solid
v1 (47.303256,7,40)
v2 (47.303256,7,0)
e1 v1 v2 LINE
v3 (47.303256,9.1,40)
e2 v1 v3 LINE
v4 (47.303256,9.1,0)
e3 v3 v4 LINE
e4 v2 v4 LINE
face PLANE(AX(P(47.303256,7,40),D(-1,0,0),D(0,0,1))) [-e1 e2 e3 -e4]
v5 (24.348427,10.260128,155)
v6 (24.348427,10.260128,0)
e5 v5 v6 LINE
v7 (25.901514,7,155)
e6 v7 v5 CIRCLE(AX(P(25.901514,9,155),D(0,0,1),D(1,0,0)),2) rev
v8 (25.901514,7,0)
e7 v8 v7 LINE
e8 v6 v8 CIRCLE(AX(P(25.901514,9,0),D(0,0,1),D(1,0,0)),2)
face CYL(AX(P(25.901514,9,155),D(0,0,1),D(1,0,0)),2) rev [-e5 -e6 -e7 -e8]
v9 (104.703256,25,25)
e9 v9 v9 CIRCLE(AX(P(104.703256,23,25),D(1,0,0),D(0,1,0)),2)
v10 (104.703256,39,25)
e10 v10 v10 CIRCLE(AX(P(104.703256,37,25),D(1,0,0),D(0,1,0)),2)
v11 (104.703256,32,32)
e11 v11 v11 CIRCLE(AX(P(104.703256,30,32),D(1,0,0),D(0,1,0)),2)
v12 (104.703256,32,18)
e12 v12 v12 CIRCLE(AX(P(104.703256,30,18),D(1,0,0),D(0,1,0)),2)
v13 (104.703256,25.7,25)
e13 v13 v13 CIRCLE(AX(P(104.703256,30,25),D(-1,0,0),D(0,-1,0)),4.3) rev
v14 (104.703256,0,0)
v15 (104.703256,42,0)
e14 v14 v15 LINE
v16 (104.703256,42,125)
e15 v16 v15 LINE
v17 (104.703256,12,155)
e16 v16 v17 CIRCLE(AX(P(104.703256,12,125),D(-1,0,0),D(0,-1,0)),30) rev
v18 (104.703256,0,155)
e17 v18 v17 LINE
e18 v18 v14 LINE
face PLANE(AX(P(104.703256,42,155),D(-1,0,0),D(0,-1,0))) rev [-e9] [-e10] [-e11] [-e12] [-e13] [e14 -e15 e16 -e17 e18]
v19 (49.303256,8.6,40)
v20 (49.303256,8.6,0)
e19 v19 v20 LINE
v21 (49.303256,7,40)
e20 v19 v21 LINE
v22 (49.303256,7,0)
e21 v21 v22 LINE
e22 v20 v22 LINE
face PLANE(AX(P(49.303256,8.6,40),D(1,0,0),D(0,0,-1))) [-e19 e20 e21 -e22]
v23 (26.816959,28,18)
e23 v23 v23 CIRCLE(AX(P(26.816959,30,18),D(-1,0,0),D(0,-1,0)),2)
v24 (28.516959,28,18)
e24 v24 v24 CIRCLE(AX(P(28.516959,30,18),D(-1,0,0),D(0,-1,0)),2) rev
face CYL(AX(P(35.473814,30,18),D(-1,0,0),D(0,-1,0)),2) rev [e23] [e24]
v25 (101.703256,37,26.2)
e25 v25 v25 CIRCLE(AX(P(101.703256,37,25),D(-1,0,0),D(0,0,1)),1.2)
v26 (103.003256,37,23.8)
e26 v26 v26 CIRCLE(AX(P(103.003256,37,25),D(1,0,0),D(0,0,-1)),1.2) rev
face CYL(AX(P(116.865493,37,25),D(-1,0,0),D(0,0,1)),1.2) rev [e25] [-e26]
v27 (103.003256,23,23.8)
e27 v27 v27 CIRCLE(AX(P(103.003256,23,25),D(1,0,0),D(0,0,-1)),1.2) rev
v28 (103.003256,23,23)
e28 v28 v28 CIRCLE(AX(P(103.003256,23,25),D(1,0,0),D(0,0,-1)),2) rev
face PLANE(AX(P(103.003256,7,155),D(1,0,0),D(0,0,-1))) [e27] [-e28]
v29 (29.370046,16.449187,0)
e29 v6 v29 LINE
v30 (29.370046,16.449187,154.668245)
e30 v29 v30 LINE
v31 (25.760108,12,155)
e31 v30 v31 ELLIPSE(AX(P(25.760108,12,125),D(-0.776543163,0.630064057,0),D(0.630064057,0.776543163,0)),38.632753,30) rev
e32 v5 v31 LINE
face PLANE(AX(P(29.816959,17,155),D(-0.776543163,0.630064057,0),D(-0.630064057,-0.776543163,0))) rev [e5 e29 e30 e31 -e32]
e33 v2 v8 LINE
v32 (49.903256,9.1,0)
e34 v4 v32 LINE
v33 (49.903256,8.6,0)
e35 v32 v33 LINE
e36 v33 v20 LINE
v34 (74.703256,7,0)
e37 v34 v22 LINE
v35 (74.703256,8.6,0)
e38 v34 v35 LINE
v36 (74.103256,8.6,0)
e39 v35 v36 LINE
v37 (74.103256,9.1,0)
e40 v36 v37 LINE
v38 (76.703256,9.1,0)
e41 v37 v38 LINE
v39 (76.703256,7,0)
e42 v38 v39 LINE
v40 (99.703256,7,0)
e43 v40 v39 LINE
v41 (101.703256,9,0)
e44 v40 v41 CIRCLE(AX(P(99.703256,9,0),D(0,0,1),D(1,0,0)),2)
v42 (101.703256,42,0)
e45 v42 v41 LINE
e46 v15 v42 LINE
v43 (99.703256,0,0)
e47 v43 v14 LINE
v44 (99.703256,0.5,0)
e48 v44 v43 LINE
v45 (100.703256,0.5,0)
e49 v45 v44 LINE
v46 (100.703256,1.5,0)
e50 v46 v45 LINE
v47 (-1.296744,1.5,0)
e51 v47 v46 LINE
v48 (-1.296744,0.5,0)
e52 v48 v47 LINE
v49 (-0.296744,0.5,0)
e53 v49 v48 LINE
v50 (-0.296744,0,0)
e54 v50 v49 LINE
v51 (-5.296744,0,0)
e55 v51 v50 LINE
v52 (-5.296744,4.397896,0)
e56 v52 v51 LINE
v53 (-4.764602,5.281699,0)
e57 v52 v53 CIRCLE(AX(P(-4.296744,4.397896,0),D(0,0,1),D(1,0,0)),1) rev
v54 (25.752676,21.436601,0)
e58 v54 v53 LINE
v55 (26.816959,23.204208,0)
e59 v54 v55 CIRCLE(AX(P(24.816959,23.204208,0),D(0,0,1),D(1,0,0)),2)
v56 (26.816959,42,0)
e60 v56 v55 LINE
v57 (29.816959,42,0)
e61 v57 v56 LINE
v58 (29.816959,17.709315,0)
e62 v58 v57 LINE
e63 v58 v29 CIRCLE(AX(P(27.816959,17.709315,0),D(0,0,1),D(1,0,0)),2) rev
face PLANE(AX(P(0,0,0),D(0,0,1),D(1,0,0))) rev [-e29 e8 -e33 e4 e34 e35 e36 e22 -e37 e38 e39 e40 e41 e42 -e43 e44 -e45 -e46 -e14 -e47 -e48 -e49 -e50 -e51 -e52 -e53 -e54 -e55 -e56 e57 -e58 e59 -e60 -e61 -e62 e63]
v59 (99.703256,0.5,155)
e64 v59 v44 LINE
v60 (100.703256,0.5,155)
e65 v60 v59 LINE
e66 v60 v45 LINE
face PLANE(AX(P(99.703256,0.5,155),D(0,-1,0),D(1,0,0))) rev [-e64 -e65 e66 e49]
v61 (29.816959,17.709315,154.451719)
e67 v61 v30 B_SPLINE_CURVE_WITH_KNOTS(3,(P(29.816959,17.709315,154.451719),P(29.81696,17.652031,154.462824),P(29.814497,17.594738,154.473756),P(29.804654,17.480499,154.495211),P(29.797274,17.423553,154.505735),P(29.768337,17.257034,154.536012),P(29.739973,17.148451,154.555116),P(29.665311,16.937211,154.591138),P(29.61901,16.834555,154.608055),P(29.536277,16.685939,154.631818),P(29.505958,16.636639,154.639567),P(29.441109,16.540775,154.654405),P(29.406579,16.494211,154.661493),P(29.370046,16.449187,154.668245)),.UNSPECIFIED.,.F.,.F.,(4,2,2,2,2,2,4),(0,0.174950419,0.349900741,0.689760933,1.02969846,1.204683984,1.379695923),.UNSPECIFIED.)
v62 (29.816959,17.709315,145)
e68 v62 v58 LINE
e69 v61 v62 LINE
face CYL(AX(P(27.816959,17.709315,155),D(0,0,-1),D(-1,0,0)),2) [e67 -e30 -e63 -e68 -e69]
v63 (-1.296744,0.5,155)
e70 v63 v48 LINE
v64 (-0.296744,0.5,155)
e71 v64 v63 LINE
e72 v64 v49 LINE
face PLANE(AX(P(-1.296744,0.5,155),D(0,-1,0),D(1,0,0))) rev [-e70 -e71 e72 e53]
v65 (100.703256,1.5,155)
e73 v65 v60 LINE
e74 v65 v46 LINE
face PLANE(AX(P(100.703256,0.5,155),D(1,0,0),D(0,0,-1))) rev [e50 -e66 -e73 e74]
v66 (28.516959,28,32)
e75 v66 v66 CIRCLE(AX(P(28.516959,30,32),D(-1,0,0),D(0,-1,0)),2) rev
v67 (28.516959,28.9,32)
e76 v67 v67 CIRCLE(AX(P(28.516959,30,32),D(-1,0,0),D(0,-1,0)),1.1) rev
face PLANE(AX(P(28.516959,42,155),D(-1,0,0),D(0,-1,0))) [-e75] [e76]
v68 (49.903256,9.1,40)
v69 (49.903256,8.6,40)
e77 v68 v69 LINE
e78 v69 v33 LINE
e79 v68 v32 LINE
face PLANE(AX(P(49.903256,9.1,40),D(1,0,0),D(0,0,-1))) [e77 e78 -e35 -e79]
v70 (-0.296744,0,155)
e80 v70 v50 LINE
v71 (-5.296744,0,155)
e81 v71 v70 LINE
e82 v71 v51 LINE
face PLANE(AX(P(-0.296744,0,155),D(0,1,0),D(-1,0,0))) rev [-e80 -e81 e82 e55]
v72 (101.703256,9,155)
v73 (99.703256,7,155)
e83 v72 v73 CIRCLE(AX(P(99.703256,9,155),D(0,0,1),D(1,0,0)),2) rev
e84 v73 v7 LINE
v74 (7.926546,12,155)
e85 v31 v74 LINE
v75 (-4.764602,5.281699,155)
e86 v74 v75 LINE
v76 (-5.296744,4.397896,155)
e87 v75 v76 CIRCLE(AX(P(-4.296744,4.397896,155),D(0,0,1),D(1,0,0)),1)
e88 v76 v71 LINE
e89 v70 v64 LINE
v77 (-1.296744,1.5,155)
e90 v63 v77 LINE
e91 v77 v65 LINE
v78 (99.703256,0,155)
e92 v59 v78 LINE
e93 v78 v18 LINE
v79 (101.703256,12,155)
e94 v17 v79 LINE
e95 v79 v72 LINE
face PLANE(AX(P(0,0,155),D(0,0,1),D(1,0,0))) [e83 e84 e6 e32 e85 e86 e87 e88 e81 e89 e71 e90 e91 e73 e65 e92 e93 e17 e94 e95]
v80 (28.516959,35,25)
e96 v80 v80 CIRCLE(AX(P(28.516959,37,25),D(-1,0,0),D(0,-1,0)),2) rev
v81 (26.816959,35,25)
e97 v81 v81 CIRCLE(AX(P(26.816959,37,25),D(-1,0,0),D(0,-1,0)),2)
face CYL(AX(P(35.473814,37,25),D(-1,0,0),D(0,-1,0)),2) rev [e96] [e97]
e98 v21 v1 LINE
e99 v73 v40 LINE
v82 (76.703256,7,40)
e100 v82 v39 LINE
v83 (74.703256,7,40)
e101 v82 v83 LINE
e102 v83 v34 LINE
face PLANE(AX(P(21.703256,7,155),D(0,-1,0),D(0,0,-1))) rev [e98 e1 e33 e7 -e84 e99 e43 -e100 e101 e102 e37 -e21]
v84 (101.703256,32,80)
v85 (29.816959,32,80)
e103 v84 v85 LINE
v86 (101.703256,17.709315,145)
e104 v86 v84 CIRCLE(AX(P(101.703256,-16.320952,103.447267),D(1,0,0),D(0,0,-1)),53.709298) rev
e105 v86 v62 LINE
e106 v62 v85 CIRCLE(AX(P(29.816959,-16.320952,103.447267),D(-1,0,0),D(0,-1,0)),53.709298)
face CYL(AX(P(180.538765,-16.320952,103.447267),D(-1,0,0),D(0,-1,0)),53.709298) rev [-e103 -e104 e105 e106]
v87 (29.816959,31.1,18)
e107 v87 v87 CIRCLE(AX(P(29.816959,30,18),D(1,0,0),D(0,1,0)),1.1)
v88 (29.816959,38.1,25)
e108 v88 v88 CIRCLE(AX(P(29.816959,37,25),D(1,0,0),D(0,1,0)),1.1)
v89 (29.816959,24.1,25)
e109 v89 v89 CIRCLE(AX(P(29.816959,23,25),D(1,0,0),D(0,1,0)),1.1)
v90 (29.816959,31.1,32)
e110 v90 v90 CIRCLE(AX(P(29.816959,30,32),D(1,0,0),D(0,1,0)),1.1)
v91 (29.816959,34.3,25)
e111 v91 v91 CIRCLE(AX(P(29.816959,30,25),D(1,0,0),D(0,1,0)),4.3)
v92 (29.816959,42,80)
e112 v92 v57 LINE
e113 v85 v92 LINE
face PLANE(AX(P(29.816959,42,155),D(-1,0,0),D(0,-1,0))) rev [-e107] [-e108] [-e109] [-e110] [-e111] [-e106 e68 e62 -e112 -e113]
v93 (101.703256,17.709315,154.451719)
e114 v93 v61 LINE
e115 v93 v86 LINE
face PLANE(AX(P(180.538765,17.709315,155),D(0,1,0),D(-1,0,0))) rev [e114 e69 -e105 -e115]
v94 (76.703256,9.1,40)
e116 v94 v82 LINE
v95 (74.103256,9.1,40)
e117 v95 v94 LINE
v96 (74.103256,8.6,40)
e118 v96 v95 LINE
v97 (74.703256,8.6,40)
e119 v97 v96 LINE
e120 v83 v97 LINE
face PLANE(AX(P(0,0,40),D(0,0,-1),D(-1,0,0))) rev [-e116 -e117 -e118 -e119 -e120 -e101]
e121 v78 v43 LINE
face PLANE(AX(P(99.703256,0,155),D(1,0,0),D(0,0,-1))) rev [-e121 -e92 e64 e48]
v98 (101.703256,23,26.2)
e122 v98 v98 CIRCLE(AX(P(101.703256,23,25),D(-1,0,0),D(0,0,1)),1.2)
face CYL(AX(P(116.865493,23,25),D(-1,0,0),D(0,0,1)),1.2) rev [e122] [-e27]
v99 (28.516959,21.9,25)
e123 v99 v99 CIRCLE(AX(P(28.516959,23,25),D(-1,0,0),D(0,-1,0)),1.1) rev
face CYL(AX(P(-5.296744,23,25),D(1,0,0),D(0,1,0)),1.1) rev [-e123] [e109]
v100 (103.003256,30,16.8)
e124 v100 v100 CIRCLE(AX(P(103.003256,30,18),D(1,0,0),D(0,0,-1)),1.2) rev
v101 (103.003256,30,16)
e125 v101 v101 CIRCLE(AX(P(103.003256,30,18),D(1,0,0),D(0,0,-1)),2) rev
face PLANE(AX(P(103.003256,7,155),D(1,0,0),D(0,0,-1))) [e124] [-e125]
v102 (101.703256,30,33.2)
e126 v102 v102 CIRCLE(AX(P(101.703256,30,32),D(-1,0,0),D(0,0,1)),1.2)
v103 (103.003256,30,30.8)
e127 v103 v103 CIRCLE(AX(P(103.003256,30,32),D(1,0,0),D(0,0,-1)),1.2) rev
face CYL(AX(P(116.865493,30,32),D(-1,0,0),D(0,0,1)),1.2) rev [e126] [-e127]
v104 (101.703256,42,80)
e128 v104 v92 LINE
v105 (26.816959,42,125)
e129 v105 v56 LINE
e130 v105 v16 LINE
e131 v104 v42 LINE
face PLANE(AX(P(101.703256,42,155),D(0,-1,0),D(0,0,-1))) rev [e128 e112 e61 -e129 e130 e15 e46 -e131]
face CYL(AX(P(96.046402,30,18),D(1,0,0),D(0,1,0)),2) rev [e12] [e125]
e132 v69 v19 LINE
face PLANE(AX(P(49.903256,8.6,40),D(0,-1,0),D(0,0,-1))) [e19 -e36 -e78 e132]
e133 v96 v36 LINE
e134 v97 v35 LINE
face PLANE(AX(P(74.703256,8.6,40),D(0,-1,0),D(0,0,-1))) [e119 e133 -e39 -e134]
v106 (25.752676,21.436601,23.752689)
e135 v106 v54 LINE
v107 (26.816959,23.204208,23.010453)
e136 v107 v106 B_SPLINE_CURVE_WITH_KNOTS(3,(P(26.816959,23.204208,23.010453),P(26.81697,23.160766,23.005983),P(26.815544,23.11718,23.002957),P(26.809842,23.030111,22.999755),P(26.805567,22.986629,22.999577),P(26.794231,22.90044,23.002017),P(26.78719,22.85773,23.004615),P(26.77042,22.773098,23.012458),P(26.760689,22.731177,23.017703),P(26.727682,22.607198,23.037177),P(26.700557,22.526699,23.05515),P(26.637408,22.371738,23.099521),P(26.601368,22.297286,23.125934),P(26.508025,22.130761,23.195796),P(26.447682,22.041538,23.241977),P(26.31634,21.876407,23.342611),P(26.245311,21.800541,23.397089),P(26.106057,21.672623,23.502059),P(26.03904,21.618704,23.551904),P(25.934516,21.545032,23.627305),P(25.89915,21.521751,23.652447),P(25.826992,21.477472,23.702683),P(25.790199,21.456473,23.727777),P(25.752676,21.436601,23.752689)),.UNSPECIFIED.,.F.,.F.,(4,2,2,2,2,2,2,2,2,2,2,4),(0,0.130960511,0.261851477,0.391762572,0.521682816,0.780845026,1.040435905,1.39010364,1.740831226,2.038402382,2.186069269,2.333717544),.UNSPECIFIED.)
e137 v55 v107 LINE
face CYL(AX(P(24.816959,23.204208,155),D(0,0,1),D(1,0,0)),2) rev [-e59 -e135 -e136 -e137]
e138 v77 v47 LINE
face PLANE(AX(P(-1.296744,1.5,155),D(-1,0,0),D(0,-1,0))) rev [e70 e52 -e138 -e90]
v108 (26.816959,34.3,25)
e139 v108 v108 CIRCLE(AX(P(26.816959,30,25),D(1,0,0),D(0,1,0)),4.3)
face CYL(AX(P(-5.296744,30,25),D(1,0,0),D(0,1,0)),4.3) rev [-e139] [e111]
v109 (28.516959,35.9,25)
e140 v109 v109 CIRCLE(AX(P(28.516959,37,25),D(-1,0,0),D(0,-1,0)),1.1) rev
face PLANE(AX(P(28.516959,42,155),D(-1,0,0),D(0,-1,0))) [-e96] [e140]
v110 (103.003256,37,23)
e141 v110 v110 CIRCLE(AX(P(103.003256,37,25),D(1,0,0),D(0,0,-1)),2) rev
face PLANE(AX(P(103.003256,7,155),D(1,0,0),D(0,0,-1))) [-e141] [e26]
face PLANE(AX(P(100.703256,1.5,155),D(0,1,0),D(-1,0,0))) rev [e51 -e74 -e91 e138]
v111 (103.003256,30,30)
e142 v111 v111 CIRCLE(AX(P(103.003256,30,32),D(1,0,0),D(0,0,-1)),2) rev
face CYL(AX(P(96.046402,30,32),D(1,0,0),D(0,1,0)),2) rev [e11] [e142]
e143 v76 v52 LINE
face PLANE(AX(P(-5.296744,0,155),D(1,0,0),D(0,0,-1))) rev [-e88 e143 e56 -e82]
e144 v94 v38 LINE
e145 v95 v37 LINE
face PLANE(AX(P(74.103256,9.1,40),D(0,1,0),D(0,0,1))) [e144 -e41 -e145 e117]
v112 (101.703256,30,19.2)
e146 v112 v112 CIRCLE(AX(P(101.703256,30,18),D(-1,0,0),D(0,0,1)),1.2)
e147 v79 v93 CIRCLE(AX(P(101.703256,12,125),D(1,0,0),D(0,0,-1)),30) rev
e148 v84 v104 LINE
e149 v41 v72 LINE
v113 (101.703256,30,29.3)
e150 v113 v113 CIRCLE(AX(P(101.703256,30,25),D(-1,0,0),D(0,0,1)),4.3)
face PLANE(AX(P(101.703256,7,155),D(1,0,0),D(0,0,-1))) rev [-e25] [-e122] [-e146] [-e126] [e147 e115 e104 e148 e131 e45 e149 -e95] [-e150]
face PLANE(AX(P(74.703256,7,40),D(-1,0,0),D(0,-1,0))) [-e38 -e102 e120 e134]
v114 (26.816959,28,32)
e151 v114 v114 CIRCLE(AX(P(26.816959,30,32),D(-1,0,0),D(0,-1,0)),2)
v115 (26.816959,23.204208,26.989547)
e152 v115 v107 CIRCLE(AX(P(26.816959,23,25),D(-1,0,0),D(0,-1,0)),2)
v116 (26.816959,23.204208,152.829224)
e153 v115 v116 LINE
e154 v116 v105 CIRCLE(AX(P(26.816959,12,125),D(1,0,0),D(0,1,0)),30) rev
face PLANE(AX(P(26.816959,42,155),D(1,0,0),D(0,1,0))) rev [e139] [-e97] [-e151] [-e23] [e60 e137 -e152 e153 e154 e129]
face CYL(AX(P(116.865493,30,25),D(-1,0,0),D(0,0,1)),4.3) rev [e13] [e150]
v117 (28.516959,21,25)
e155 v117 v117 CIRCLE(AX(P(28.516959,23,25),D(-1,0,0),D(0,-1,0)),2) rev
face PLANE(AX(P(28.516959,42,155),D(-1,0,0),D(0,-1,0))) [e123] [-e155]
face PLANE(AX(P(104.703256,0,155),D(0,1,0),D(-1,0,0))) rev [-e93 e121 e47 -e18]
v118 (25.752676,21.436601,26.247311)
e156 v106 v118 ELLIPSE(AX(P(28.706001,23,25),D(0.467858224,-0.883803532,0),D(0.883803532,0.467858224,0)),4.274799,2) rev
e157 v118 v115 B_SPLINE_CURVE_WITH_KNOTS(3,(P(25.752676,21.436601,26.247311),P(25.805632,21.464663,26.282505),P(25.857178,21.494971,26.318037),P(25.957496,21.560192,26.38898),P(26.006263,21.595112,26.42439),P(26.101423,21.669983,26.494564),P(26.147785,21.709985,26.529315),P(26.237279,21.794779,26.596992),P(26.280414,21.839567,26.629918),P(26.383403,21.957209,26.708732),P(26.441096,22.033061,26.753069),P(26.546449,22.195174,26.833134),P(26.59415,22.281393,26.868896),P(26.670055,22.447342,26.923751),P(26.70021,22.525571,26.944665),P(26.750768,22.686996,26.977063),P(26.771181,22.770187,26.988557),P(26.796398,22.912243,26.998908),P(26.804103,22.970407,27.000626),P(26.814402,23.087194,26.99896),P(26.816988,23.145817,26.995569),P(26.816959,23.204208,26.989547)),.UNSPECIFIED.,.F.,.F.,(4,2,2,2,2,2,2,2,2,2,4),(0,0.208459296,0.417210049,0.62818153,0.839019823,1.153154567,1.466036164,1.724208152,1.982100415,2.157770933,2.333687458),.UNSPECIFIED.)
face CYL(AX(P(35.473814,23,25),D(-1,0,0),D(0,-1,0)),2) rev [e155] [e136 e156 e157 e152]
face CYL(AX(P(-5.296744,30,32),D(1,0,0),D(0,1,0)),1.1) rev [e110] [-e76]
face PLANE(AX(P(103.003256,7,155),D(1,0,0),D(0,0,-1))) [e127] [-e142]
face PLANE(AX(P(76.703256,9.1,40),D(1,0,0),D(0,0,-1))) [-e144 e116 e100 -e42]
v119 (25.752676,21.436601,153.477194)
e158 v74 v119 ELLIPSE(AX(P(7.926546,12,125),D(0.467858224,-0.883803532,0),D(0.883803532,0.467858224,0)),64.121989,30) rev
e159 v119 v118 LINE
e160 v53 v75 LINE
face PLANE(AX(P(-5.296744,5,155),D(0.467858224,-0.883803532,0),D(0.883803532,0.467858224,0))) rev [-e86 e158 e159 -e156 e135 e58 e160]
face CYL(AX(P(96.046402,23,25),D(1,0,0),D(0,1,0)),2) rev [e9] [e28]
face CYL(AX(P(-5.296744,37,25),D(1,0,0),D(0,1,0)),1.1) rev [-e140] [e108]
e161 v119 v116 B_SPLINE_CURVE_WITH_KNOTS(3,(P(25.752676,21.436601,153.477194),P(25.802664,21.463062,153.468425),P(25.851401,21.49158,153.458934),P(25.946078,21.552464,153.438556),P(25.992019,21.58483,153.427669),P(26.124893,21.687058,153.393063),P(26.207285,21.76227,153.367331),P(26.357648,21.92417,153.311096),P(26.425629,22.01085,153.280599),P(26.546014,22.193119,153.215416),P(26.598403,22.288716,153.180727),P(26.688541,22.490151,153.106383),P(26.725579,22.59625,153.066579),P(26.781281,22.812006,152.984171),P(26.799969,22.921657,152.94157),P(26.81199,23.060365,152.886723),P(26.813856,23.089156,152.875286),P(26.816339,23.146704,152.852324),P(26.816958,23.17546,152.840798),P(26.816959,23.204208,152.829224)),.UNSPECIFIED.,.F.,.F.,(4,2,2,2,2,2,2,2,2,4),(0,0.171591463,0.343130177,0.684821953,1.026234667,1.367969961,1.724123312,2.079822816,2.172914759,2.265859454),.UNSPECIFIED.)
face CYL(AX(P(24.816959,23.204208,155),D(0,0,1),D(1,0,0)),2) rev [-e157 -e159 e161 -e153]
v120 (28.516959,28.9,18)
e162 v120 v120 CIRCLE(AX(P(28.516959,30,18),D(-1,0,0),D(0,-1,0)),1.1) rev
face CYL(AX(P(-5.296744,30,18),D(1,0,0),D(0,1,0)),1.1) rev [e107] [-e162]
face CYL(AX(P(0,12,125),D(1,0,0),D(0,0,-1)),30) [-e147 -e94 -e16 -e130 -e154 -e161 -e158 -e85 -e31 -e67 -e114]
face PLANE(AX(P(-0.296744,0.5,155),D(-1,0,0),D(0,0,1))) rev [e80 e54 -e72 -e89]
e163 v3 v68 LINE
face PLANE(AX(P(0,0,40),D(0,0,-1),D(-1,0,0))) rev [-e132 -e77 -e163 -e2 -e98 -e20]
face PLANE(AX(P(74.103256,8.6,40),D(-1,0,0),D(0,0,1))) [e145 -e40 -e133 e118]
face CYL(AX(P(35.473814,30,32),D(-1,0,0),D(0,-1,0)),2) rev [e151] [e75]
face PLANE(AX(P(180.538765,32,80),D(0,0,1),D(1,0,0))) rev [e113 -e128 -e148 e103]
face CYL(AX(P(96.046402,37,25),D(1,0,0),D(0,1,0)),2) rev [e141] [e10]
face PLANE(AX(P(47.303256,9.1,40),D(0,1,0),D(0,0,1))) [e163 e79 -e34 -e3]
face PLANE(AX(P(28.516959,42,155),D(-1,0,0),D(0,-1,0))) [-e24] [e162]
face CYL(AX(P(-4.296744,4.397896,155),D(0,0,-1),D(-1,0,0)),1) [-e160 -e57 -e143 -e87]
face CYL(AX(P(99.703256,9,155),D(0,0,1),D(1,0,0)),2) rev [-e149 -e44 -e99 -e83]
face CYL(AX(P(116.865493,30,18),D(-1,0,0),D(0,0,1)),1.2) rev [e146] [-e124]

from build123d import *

# Parameters (mm, degrees)
BOSS_EXTRUDE1_DEPTH = 155
SKETCH3_R           = 4.3
SKETCH3_R_2         = 1.2
CUT_EXTRUDE1_DEPTH  = 3
SKETCH2_R           = 4.3
SKETCH2_R_2         = 1.1
CUT_EXTRUDE2_DEPTH  = 178.191866295
SKETCH4_R           = 2
CUT_EXTRUDE3_DEPTH  = 1.7
CUT_EXTRUDE4_START  = -1.7
SKETCH5_R           = 2
CUT_EXTRUDE4_DEPTH  = 1.7
CUT_EXTRUDE5_START  = -1.7
SKETCH5_4_R         = 2
CUT_EXTRUDE5_DEPTH  = 181.180461853
FILLET1_R           = 2
FILLET2_R           = 1
BOSS_EXTRUDE3_DEPTH = 71.886297018
FILLET3_R           = 30
BOSS_EXTRUDE4_DEPTH = 40


with BuildPart() as part:
    # Sketch1 → Boss-Extrude1 (new body)
    with BuildSketch(Plane.XY):
        Polygon((29.816959294, 42), (29.816959294, 17), (21.703256312, 7), (101.703256312, 7), (101.703256312, 42), (104.703256312, 42), (104.703256312, 14.387755102), (104.703256312, 0), (99.703256312, 0), (99.703256312, 0.5), (100.703256312, 0.5), (100.703256312, 1.5), (-1.296743688, 1.5), (-1.296743688, 0.5), (-0.296743688, 0.5), (-0.296743688, 0), (-5.296743688, 0), (-5.296743688, 5), (26.816959294, 22), (26.816959294, 42), align=None)
    extrude(amount=BOSS_EXTRUDE1_DEPTH)

    # Sketch3 → Cut-Extrude1 (cut)
    with BuildSketch(Plane.ZY.offset(-101.703256312)):
        with Locations((25, 30)):
            Circle(SKETCH3_R)
        with Locations((25, 37)):
            Circle(SKETCH3_R_2)
        with Locations((32, 30)):
            Circle(SKETCH3_R_2)
        with Locations((25, 23)):
            Circle(SKETCH3_R_2)
        with Locations((18, 30)):
            Circle(SKETCH3_R_2)
    extrude(amount=-CUT_EXTRUDE1_DEPTH, mode=Mode.SUBTRACT)

    # Sketch2 → Cut-Extrude2 (cut, through all)
    with BuildSketch(Plane(origin=(29.816959294, 0, 0), x_dir=(0, 0, -1), z_dir=(1, 0, 0))):
        with Locations(Location((-25, 30, 0), (0, 0, 180))):
            Circle(SKETCH2_R)
        with Locations(Location((-25, 37, 0), (0, 0, 90))):
            Circle(SKETCH2_R_2)
        with Locations(Location((-18, 30, 0), (0, 0, 90))):
            Circle(SKETCH2_R_2)
        with Locations(Location((-25, 23, 0), (0, 0, 90))):
            Circle(SKETCH2_R_2)
        with Locations(Location((-32, 30, 0), (0, 0, 90))):
            Circle(SKETCH2_R_2)
    extrude(amount=-CUT_EXTRUDE2_DEPTH, mode=Mode.SUBTRACT)

    # Sketch4 → Cut-Extrude3 (cut)
    with BuildSketch(Plane(origin=(104.703256312, 0, 0), x_dir=(0, 0, -1), z_dir=(1, 0, 0))):
        with Locations(Location((-32, 30, 0), (0, 0, 90))):
            Circle(SKETCH4_R)
        with Locations(Location((-25, 37, 0), (0, 0, 90))):
            Circle(SKETCH4_R)
        with Locations(Location((-18, 30, 0), (0, 0, 90))):
            Circle(SKETCH4_R)
        with Locations(Location((-25, 23, 0), (0, 0, 90))):
            Circle(SKETCH4_R)
    extrude(amount=-CUT_EXTRUDE3_DEPTH, mode=Mode.SUBTRACT)

    # Sketch5 → Cut-Extrude4 (cut)
    with BuildSketch(Plane.ZY.offset(-26.816959294).offset(CUT_EXTRUDE4_START)):
        with Locations(Location((25, 23, 0), (0, 0, 90))):
            Circle(SKETCH5_R)
        with Locations(Location((32, 30, 0), (0, 0, 90))):
            Circle(SKETCH5_R)
        with Locations(Location((25, 37, 0), (0, 0, 90))):
            Circle(SKETCH5_R)
        with Locations(Location((18, 30, 0), (0, 0, 90))):
            Circle(SKETCH5_R)
    extrude(amount=CUT_EXTRUDE4_DEPTH, mode=Mode.SUBTRACT)

    # Sketch5<4> → Cut-Extrude5 (cut, through all)
    with BuildSketch(Plane.ZY.offset(-26.816959294).offset(CUT_EXTRUDE5_START)):
        with Locations(Location((25, 23, 0), (0, 0, 90))):
            Circle(SKETCH5_4_R)
        with Locations(Location((32, 30, 0), (0, 0, 90))):
            Circle(SKETCH5_4_R)
        with Locations(Location((25, 37, 0), (0, 0, 90))):
            Circle(SKETCH5_4_R)
        with Locations(Location((18, 30, 0), (0, 0, 90))):
            Circle(SKETCH5_4_R)
    extrude(amount=CUT_EXTRUDE5_DEPTH, mode=Mode.SUBTRACT)

    # Fillet1
    fillet1_edges = [part.edges().sort_by_distance(p)[0] for p in [
        (101.703256312, 7, 77.5),
        (29.816959294, 17, 77.5),
        (21.703256312, 7, 77.5),
        (26.816959294, 22, 11.633974596),
        (26.816959294, 22, 90.866025404),
    ]]
    fillet(fillet1_edges, radius=FILLET1_R)

    # Fillet2
    fillet2_edges = [part.edges().sort_by_distance(p)[0] for p in [
        (-5.296743688, 5, 77.5),
    ]]
    fillet(fillet2_edges, radius=FILLET2_R)

    # Sketch8 → Boss-Extrude3 (add)
    with BuildSketch(Plane(origin=(29.816959294, 0, 0), x_dir=(0, 0, -1), z_dir=(1, 0, 0))):
        with BuildLine():
            Line((-155, 42), (-155, 17.709314663))
            Line((-155, 17.709314663), (-145, 17.709314663))
            ThreePointArc((-145, 17.709314663), (-114.980171869, 36.135513896), (-80, 32))
            Line((-80, 32), (-80, 42))
            Line((-80, 42), (-155, 42))
        make_face()
    extrude(amount=BOSS_EXTRUDE3_DEPTH)

    # Fillet3
    # the kernel refuses this fillet: 30 mm, written as the material it takes off along each edge
    with BuildSketch(Plane(origin=(-48.183040706, 42, 155), x_dir=(0, -1, 0), z_dir=(1, 0, 0))) as fillet3_piece_1:
        with BuildLine():
            CenterArc((FILLET3_R, FILLET3_R), FILLET3_R, 180, 90)
            Line((0, FILLET3_R), (0, 0))
            Line((0, 0), (FILLET3_R, 0))
        make_face()
    extrude(amount=227.886297018, mode=Mode.SUBTRACT)

    # Sketch10 → Boss-Extrude4 (add)
    with BuildSketch(Plane(origin=(0, 0, 0), x_dir=(-1, 0, 0), z_dir=(0, 0, -1))):
        Polygon((-74.703256312, 7), (-74.703256312, 8.6), (-74.103256312, 8.6), (-74.103256312, 9.1), (-76.703256312, 9.1), (-76.703256312, 7), align=None)
        Polygon((-47.303256312, 7), (-47.303256312, 9.1), (-49.903256312, 9.1), (-49.903256312, 8.6), (-49.303256312, 8.6), (-49.303256312, 7), align=None)
    extrude(amount=-BOSS_EXTRUDE4_DEPTH)


solid = part.part
